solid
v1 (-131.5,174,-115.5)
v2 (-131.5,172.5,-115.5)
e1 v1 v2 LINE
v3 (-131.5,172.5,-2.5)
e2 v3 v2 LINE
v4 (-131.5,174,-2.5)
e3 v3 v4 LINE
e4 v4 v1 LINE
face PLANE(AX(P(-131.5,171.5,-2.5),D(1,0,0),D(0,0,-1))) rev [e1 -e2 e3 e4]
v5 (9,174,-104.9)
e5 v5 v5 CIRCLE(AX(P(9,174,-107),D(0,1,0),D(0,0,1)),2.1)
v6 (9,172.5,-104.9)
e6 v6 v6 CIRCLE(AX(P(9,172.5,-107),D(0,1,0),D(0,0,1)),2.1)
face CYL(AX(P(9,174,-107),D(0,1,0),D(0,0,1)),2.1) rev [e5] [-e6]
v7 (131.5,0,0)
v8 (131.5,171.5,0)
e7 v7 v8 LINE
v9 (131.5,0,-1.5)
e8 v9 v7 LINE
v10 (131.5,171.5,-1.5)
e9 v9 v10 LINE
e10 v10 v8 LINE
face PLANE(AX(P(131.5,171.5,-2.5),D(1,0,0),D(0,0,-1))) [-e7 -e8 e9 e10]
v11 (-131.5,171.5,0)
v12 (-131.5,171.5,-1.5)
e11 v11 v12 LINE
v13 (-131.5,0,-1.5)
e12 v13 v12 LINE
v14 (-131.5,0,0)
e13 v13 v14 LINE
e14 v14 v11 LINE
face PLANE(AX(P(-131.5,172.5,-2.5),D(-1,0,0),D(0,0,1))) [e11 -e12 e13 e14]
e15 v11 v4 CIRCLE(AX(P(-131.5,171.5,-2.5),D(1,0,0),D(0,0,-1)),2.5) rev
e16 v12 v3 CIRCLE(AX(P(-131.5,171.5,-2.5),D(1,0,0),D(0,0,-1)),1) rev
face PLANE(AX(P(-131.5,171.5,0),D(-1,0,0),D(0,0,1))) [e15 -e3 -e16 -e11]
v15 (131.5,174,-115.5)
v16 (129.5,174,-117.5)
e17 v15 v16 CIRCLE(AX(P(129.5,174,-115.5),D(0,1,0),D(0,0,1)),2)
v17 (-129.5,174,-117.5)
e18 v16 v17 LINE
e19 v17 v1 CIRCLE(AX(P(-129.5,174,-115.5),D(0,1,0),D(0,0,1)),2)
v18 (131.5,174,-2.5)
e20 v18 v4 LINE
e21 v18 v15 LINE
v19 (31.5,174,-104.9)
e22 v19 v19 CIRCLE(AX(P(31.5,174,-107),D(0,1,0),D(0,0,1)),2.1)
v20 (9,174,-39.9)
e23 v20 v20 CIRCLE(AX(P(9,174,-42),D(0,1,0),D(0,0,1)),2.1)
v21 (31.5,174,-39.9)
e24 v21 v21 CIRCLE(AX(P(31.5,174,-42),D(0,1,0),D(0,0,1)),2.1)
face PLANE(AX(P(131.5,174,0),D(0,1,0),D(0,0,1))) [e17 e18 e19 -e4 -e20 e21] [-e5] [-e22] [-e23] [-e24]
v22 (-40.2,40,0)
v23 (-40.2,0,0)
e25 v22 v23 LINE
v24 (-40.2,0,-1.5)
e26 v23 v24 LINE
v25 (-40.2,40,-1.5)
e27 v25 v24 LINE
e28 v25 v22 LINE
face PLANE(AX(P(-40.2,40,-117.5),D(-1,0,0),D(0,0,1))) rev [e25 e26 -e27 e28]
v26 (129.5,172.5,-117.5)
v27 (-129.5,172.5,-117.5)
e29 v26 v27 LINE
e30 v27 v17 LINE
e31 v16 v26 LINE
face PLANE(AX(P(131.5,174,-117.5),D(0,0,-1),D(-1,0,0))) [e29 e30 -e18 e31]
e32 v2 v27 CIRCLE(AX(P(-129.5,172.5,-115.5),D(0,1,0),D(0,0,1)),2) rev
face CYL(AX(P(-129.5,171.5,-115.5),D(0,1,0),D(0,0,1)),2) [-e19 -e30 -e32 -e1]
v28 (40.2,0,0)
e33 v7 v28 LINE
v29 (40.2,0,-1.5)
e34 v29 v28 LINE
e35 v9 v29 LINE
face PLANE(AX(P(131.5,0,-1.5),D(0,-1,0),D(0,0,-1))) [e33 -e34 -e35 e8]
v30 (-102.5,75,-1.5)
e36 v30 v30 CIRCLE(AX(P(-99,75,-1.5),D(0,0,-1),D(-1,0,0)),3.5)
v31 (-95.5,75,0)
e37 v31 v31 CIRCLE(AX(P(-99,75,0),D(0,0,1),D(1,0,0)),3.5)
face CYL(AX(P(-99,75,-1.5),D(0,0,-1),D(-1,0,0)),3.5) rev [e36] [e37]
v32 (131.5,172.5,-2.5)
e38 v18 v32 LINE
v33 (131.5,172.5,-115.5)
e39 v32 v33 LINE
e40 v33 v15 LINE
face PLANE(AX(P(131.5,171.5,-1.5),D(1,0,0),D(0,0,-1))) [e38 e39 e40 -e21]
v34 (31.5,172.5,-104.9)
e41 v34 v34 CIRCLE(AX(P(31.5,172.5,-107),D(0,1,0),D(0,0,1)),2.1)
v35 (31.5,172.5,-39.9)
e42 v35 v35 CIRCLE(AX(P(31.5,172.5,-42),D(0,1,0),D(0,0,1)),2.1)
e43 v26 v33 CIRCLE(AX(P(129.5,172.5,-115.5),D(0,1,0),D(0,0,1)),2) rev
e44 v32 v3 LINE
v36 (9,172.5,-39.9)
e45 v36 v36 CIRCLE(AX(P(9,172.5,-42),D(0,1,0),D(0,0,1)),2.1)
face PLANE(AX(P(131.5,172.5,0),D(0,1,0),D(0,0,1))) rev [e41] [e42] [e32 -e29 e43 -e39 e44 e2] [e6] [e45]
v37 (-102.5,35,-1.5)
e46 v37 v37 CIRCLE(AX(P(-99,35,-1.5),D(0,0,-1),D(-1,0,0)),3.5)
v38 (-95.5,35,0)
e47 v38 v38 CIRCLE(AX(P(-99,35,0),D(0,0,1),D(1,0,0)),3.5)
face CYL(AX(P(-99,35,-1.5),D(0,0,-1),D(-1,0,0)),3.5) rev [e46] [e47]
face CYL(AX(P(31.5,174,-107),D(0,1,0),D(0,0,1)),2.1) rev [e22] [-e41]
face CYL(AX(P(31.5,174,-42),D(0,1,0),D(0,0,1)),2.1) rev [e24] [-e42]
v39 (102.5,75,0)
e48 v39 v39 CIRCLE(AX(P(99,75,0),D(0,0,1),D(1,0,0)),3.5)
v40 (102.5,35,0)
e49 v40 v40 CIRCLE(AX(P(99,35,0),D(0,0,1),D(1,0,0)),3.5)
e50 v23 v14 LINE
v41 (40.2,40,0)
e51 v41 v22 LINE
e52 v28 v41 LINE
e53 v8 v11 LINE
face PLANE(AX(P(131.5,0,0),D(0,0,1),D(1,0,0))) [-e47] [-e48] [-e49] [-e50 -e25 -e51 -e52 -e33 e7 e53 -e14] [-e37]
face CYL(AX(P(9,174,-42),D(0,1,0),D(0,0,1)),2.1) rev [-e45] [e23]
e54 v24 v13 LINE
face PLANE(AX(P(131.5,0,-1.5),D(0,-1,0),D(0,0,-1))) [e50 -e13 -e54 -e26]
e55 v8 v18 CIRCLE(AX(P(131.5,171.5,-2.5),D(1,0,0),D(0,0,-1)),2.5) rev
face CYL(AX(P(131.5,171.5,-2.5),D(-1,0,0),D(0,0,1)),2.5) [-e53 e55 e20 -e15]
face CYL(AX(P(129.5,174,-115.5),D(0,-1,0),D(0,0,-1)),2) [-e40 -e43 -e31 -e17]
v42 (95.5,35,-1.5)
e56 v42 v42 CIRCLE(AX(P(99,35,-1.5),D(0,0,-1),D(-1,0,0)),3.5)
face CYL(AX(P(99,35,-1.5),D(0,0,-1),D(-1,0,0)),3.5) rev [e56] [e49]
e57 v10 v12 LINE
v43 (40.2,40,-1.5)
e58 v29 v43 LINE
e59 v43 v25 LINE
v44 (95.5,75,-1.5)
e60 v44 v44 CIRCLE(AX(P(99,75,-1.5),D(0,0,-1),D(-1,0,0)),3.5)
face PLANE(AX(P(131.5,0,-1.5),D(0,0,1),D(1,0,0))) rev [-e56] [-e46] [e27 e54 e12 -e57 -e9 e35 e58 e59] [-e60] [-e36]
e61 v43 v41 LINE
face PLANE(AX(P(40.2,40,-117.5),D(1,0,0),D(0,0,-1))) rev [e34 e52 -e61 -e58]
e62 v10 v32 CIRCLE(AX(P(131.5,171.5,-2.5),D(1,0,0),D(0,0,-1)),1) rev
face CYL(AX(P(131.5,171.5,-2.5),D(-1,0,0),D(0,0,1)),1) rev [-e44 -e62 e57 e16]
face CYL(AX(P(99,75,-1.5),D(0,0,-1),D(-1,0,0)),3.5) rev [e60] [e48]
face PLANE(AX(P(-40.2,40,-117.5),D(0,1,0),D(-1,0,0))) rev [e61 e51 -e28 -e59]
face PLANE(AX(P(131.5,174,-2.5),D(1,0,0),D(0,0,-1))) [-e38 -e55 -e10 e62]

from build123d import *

# Parameters (mm, degrees)
SM_BASE_FLANGE_1_DEPTH = 131.5
HOLE_WIZARD_M6_1_D     = 7
SKETCH_6_W             = 80.4
SKETCH_6_H             = 40
CUT_EXTRUDE_1_DEPTH    = 248.738773711
HOLE_WIZARD_M5_1_D     = 4.2
OTHER_START            = 172.5
OTHER_1_DEPTH          = 1.5


# Read off the part's stored shape, not the designer's step: 断开-边角1
# Sheet-metal steps are written as plain solids
with BuildPart() as part:
    # Sketch 1 → 基体-法兰1 (new, symmetric)
    with BuildSketch(Plane(origin=(0, 0, 0), x_dir=(0, 0, -1), z_dir=(1, 0, 0))):
        with BuildLine():
            Line((0, 0), (0, 171.5))
            ThreePointArc((0, 171.5), (0.732233047, 173.267766953), (2.5, 174))
            Line((2.5, 174), (117.5, 174))
            Line((117.5, 174), (117.5, 172.5))
            Line((117.5, 172.5), (2.5, 172.5))
            ThreePointArc((2.5, 172.5), (1.792893219, 172.207106781), (1.5, 171.5))
            Line((1.5, 171.5), (1.5, 0))
            Line((1.5, 0), (0, 0))
        make_face()
    extrude(amount=SM_BASE_FLANGE_1_DEPTH, both=True)

    # M6 间隙孔1 (through all)
    with Locations(Plane(origin=(0, 0, -1.5), x_dir=(-1, 0, 0), z_dir=(0, 0, -1))):
        with Locations((-99, 75), (-99, 35), (99, 35), (99, 75)):
            Hole(HOLE_WIZARD_M6_1_D / 2)

    # 草图6 → 切除-拉伸1 (cut, through all)
    with BuildSketch(Plane.XY):
        with Locations((0, 20)):
            Rectangle(SKETCH_6_W, SKETCH_6_H)
    extrude(amount=-CUT_EXTRUDE_1_DEPTH, mode=Mode.SUBTRACT)

    # M5 螺纹孔1 (through all)
    with Locations(Plane(origin=(0, 174, 0), x_dir=(1, 0, 0), z_dir=(0, 1, 0))):
        with Locations((9, 107), (31.5, 107), (31.5, 42), (9, 42)):
            Hole(HOLE_WIZARD_M5_1_D / 2)

    # Other 1 outline → Other 1 (cut)
    with BuildSketch(Plane(origin=(0, 0, 0), x_dir=(1, 0, 0), z_dir=(0, 1, 0)).offset(OTHER_START)):
        with BuildLine():
            Line((131.5, 117.5), (129.5, 117.5))
            ThreePointArc((129.5, 117.5), (130.914213562, 116.914213562), (131.5, 115.5))
            Line((131.5, 115.5), (131.5, 117.5))
        make_face()
        with BuildLine():
            ThreePointArc((-131.5, 115.5), (-130.914213562, 116.914213562), (-129.5, 117.5))
            Line((-129.5, 117.5), (-131.5, 117.5))
            Line((-131.5, 117.5), (-131.5, 115.5))
        make_face()
    extrude(amount=OTHER_1_DEPTH, mode=Mode.SUBTRACT)


solid = part.part
